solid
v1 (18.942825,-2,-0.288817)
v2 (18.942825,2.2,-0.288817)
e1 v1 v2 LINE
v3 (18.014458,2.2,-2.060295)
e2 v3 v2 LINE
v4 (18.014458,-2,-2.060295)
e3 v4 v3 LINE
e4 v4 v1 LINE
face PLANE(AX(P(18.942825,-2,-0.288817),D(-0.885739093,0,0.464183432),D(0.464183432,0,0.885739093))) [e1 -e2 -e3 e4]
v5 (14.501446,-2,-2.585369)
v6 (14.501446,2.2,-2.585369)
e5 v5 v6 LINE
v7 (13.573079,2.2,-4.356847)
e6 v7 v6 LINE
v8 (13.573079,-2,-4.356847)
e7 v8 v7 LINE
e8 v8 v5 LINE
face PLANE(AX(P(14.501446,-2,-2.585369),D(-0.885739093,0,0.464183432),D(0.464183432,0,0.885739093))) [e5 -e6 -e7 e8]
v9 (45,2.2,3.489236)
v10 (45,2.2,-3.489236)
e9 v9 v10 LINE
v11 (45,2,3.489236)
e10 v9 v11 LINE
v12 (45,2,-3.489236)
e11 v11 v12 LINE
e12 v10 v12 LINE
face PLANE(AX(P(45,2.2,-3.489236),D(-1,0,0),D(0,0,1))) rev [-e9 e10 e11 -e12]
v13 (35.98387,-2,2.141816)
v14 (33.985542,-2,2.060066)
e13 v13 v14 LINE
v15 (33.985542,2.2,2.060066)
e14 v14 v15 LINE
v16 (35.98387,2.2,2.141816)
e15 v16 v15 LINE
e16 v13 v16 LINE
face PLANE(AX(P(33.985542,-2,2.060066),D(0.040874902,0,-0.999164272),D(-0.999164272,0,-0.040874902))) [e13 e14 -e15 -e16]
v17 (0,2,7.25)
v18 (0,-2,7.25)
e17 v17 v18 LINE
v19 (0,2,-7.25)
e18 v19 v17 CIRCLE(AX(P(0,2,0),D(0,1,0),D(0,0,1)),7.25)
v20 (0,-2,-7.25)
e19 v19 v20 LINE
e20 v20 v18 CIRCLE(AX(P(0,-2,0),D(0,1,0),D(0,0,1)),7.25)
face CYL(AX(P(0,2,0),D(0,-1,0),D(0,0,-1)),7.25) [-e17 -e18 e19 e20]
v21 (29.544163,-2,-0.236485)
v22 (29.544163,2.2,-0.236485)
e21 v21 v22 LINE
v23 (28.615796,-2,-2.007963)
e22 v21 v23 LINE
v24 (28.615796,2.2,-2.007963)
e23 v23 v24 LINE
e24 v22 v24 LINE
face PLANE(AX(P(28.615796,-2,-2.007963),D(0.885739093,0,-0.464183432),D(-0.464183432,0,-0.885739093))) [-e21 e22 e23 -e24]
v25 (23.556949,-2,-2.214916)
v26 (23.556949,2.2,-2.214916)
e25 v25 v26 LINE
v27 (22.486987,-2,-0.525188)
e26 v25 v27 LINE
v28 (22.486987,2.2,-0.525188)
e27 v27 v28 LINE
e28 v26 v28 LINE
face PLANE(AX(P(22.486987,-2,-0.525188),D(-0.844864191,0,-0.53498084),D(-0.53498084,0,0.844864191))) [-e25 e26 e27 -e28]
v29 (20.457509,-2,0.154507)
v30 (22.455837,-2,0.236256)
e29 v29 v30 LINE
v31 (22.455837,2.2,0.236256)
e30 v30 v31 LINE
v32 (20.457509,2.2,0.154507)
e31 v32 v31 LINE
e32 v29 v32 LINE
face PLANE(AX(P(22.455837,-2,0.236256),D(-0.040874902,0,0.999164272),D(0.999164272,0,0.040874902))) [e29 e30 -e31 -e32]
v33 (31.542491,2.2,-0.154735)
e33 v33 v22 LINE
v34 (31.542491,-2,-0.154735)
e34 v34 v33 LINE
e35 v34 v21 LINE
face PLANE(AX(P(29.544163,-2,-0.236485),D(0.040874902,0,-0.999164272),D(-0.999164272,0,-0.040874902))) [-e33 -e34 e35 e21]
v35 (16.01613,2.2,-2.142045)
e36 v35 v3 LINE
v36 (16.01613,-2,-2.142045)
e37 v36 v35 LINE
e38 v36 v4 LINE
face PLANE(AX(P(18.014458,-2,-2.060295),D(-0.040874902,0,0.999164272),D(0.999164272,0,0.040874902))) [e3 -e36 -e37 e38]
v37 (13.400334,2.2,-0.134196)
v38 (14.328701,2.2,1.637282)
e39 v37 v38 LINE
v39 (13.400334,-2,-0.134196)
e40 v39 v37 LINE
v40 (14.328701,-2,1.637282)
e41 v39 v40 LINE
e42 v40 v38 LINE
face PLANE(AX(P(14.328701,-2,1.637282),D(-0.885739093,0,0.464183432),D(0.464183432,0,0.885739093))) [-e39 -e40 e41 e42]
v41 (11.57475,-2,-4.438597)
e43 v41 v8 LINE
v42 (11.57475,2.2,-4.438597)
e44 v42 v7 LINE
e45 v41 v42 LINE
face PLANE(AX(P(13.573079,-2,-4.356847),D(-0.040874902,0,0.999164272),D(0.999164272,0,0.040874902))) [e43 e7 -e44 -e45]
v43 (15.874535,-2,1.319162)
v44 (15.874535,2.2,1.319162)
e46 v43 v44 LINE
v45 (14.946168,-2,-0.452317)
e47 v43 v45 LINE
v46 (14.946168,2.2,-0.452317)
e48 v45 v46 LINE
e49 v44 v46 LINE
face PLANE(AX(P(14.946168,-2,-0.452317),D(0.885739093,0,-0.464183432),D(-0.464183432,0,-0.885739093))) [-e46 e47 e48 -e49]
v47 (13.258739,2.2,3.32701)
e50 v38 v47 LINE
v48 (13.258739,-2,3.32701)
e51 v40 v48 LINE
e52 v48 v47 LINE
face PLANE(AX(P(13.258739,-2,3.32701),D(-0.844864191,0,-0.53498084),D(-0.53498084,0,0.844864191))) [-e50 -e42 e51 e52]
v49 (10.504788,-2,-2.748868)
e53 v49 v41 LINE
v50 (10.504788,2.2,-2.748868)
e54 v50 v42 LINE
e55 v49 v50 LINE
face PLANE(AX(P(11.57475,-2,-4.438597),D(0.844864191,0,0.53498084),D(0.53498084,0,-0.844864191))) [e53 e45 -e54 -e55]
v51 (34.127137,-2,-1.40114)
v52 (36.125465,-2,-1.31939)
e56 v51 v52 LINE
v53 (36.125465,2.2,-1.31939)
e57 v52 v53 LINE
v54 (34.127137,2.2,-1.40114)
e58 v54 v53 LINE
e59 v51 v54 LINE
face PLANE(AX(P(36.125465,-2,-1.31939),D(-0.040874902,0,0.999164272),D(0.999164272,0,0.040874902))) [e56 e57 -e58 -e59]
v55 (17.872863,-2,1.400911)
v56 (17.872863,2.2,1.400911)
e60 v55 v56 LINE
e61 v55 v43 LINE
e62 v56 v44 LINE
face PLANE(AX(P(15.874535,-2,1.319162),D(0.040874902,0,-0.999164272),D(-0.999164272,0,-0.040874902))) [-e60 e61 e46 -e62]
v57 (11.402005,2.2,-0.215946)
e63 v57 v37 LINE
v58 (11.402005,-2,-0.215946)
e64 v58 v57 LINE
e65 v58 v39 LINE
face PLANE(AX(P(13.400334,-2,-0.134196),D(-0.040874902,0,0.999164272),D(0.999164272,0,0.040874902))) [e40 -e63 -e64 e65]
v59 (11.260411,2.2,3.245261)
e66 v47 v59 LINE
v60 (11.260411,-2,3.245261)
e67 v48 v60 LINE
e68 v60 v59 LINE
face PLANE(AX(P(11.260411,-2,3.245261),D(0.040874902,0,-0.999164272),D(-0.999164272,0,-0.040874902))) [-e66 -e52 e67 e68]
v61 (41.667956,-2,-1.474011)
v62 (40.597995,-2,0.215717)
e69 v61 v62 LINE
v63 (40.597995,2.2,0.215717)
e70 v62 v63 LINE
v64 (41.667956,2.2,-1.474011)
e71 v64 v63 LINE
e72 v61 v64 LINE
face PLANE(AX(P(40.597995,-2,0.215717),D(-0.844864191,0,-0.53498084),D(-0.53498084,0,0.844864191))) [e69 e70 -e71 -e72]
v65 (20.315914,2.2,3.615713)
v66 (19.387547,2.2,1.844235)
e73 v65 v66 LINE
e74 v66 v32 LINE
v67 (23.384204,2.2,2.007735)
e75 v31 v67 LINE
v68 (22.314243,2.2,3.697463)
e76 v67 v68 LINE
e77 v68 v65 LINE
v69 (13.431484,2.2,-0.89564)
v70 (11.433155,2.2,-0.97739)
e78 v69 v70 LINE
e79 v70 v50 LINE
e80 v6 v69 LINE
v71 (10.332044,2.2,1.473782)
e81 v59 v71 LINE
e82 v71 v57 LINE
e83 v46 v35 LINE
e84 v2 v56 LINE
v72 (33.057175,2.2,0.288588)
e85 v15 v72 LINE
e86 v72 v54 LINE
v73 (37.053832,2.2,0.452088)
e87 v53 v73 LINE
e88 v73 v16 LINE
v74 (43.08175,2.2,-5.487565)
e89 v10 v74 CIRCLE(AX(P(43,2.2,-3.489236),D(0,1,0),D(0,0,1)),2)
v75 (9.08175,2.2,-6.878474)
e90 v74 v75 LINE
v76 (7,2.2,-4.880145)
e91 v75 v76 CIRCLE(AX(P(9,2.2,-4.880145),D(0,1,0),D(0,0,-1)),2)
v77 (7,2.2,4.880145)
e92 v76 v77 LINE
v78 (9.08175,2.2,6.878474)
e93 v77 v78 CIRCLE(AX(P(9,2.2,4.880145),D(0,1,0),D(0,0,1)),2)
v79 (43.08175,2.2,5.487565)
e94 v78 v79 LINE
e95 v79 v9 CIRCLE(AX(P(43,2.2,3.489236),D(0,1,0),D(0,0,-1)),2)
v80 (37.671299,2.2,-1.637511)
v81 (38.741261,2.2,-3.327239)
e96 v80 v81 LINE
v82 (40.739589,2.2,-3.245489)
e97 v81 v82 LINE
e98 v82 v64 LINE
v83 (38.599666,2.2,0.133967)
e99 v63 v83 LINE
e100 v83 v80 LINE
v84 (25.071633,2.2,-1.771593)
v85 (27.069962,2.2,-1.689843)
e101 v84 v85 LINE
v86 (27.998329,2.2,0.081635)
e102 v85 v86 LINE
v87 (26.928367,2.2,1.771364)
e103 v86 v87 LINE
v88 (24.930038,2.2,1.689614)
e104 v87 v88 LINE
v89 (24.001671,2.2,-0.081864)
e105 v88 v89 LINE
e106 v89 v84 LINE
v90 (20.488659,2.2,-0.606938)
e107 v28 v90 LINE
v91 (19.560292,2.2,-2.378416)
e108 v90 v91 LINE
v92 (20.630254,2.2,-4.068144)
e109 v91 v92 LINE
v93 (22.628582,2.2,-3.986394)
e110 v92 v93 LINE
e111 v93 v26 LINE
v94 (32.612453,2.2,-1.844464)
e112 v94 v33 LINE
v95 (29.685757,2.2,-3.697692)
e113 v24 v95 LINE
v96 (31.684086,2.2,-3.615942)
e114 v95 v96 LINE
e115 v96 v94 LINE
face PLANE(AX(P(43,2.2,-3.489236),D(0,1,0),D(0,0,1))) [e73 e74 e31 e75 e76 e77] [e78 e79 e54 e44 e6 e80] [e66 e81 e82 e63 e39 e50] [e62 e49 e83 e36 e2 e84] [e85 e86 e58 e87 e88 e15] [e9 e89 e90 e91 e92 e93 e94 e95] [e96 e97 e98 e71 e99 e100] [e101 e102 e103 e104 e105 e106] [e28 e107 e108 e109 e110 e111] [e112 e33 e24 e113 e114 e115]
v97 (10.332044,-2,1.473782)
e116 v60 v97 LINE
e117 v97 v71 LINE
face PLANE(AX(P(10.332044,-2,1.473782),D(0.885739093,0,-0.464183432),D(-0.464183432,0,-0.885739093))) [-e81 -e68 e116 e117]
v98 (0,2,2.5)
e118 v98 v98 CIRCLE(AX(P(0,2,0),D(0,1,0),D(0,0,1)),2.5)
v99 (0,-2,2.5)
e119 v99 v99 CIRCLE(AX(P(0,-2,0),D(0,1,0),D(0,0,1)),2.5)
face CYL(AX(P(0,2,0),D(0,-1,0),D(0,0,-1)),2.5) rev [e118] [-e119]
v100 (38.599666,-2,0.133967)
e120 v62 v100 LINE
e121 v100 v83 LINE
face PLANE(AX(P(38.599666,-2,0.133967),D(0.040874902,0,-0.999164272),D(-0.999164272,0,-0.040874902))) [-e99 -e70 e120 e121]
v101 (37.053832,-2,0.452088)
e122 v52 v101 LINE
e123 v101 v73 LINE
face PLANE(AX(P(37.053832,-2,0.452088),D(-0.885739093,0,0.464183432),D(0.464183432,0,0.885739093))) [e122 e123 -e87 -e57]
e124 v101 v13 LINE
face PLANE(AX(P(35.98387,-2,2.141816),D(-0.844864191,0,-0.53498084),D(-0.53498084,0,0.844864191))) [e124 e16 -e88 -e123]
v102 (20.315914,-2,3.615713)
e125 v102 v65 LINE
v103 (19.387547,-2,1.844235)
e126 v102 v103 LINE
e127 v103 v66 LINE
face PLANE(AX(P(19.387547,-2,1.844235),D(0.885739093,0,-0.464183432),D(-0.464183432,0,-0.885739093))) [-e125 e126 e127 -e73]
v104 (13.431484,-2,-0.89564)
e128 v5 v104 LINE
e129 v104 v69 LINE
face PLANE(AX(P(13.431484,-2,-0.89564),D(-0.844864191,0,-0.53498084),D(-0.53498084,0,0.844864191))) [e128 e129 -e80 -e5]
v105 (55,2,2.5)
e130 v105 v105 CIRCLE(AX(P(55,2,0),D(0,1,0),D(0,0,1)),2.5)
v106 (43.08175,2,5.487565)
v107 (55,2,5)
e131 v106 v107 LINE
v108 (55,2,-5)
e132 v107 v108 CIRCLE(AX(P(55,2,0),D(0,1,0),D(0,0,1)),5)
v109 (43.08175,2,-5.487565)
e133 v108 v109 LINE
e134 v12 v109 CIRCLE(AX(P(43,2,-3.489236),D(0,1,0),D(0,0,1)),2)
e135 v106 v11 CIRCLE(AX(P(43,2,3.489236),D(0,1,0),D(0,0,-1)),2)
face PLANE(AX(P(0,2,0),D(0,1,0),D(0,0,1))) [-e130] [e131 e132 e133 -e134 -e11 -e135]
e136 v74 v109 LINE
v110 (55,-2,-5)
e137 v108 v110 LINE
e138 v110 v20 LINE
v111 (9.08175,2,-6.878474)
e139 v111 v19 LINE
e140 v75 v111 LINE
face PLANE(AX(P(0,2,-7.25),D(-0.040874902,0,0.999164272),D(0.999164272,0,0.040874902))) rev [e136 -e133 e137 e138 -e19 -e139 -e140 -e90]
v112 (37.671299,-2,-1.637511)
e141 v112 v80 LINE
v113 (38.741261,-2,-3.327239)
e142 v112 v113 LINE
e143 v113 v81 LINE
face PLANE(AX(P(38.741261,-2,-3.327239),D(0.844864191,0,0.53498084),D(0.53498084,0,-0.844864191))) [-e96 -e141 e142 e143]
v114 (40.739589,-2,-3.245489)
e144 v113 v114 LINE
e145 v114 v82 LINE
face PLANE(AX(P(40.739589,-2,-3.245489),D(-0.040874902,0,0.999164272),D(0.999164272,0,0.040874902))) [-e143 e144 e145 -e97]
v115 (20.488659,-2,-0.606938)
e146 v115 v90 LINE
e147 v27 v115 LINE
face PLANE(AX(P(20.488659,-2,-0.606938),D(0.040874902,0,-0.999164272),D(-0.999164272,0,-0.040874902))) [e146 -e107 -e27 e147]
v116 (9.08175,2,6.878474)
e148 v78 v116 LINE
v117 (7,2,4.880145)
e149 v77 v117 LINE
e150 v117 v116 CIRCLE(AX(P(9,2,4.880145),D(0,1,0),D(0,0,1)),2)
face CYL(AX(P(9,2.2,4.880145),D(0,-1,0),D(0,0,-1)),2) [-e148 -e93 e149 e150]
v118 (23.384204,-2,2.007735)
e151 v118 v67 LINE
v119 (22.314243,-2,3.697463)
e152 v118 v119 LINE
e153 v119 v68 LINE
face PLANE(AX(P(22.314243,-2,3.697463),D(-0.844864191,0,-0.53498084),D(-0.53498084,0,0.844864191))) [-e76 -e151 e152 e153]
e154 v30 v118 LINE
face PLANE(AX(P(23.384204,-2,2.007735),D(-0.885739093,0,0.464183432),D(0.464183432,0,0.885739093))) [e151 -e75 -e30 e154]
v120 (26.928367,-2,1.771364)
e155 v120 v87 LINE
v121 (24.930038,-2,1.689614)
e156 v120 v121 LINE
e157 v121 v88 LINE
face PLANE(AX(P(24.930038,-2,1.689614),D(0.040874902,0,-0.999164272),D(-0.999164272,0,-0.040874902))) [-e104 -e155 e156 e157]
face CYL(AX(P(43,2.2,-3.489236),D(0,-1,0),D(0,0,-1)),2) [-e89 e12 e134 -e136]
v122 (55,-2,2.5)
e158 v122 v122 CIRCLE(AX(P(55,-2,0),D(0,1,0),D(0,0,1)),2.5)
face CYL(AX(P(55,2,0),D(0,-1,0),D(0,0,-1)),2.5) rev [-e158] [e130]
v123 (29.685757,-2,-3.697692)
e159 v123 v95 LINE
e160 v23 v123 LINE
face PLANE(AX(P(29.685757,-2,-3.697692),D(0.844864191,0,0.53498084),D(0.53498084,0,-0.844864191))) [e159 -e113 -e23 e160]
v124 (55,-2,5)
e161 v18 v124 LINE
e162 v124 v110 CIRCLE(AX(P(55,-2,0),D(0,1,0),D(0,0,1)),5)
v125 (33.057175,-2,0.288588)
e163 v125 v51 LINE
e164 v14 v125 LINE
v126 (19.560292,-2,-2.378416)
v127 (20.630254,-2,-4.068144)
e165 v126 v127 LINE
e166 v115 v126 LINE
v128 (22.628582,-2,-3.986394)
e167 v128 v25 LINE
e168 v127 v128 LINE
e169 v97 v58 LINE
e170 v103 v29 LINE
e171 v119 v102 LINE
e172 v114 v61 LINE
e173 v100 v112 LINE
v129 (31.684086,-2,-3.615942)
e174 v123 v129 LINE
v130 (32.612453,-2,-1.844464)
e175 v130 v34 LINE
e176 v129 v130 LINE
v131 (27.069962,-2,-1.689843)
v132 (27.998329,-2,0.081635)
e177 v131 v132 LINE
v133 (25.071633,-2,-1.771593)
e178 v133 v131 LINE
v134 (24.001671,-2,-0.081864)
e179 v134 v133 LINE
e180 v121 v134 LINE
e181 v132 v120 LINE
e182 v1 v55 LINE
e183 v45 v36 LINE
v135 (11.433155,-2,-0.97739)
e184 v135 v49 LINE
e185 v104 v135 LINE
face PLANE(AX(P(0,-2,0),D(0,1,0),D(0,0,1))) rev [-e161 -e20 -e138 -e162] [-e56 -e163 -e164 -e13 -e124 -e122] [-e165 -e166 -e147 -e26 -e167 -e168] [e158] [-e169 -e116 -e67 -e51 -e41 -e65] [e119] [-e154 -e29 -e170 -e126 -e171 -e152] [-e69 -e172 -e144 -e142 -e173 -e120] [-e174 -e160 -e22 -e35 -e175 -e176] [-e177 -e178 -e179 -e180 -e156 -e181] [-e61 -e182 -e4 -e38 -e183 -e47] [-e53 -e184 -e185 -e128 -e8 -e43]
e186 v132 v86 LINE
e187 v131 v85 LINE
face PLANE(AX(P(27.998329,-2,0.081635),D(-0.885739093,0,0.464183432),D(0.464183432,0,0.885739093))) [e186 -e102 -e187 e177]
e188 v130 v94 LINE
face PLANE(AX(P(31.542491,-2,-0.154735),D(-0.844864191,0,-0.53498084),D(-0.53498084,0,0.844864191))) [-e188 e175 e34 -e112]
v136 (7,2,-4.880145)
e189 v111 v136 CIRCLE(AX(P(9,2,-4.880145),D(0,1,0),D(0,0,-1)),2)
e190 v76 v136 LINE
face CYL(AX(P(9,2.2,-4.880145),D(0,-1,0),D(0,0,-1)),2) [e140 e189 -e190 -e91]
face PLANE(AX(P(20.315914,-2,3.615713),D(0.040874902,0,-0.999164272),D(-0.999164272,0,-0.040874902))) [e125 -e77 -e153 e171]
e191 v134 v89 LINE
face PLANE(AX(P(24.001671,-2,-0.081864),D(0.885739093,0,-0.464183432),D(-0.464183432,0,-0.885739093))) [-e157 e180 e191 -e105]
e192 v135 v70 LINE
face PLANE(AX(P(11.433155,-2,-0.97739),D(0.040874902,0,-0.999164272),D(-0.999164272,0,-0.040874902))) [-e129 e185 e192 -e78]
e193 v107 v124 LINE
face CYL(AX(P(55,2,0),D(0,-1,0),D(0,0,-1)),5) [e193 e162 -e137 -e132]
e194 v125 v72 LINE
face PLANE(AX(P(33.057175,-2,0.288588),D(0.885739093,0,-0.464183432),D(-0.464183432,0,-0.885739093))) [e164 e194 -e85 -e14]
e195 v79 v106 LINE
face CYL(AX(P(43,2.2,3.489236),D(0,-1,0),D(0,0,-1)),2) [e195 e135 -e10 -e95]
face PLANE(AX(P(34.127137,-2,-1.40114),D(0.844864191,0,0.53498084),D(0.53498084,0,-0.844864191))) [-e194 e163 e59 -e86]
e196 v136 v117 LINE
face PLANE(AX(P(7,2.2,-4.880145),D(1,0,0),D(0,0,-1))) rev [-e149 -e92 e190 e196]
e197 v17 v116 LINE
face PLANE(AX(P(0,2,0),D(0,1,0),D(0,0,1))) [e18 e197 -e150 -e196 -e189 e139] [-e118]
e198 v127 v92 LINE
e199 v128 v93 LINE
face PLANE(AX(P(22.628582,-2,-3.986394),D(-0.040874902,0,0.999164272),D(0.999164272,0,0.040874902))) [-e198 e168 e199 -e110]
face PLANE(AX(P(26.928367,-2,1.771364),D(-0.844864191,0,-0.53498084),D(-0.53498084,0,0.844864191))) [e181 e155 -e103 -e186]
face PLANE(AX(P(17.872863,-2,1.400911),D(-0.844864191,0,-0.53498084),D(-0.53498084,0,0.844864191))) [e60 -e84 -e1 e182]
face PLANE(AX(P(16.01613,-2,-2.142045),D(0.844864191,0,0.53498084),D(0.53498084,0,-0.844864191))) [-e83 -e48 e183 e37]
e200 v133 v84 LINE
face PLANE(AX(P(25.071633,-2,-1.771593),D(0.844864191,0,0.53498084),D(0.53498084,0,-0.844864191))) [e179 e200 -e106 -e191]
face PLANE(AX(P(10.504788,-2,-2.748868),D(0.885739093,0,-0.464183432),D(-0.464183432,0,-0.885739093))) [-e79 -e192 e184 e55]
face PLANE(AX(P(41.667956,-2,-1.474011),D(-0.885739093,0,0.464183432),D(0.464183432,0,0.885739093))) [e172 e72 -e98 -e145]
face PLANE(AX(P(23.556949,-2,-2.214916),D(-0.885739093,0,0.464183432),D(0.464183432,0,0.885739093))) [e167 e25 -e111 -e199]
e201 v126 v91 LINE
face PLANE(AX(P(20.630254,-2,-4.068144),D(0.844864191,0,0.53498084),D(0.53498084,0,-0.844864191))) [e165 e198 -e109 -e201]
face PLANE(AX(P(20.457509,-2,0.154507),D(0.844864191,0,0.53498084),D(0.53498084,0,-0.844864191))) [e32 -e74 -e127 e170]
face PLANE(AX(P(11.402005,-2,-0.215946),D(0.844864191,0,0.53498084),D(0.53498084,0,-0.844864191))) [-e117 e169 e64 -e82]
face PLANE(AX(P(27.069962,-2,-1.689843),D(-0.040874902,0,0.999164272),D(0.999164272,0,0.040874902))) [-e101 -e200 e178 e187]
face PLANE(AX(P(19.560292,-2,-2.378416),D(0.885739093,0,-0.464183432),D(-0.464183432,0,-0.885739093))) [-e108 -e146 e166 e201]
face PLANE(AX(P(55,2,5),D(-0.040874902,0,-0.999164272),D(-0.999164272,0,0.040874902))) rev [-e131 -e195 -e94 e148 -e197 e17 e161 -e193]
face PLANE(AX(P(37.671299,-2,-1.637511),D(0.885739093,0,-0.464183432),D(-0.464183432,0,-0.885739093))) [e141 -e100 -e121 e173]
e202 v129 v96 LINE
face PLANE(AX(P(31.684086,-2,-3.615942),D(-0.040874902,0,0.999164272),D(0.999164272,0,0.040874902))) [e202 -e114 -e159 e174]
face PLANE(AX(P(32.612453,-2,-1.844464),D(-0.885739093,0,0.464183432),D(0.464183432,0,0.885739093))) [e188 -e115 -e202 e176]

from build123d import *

# Parameters (mm, degrees)
CROQUIS1_R              = 2.5
SALIENTE_EXTRUIR1_DEPTH = 2
SALIENTE_EXTRUIR2_DEPTH = 0.2
PATR_N_START            = -2
PATR_N_DE_RAYADO2_DEPTH = 4.2


# Read off the part's stored shape, not the designer's step: Patrón de rayado2
with BuildPart() as part:
    # Croquis1 → Saliente-Extruir1 (new, symmetric)
    with BuildSketch(Plane(origin=(0, 0, 0), x_dir=(1, 0, 0), z_dir=(0, 1, 0))):
        with BuildLine():
            Line((0, 7.25), (55, 5))
            ThreePointArc((55, 5), (60, 0), (55, -5))
            Line((55, -5), (0, -7.25))
            ThreePointArc((0, -7.25), (-7.25, 0), (0, 7.25))
        make_face()
        with Locations(Location((0, 0, 0), (0, 0, 270))):
            Circle(CROQUIS1_R, mode=Mode.SUBTRACT)
        with Locations(Location((55, 0, 0), (0, 0, 270))):
            Circle(CROQUIS1_R, mode=Mode.SUBTRACT)
    extrude(amount=SALIENTE_EXTRUIR1_DEPTH, both=True)

    # Croquis2 → Saliente-Extruir2 (add)
    with BuildSketch(Plane(origin=(0, 2, 0), x_dir=(1, 0, 0), z_dir=(0, 1, 0))):
        with BuildLine():
            Line((7, 4.880145328), (7, -4.880145328))
            ThreePointArc((7, -4.880145328), (7.614990904, -6.322972346), (9.081749804, -6.878473872))
            Line((9.081749804, -6.878473872), (43.081749804, -5.487564781))
            ThreePointArc((43.081749804, -5.487564781), (44.442827018, -4.874245333), (45, -3.489236237))
            Line((45, -3.489236237), (45, 3.489236237))
            ThreePointArc((45, 3.489236237), (44.442827018, 4.874245333), (43.081749804, 5.487564781))
            Line((43.081749804, 5.487564781), (9.081749804, 6.878473872))
            ThreePointArc((9.081749804, 6.878473872), (7.614990904, 6.322972346), (7, 4.880145328))
        make_face()
    extrude(amount=SALIENTE_EXTRUIR2_DEPTH)

    # Patrón de rayado2 outline → Patrón de rayado2 (cut)
    with BuildSketch(Plane(origin=(0, 0, 0), x_dir=(1, 0, 0), z_dir=(0, 1, 0)).offset(PATR_N_START)):
        Polygon((10.504788453, 2.748868179), (11.433155318, 0.977389992), (13.431483862, 0.895640188), (14.501445541, 2.585368571), (13.573078676, 4.356846757), (11.574750132, 4.438596561), align=None)
        Polygon((20.48865892, 0.606937572), (22.486987464, 0.525187768), (23.556949143, 2.21491615), (22.628582278, 3.986394337), (20.630253734, 4.068144141), (19.560292055, 2.378415759), align=None)
        Polygon((29.544162522, 0.236485152), (31.542491066, 0.154735348), (32.612452745, 1.84446373), (31.68408588, 3.615941917), (29.685757336, 3.697691721), (28.615795657, 2.007963338), align=None)
        Polygon((38.599666124, -0.133967268), (40.597994668, -0.215717072), (41.667956347, 1.47401131), (40.739589483, 3.245489496), (38.741260939, 3.327239301), (37.67129926, 1.637510918), align=None)
        Polygon((19.387547255, -1.84423492), (20.31591412, -3.615713106), (22.314242664, -3.69746291), (23.384204343, -2.007734528), (22.455837478, -0.236256342), (20.457508934, -0.154506537), align=None)
        Polygon((11.260410517, -3.245260686), (13.258739061, -3.32701049), (14.32870074, -1.637282108), (13.400333876, 0.134196079), (11.402005332, 0.215945883), (10.332043653, -1.473782499), align=None)
        Polygon((33.057175058, -0.288588211), (33.985541923, -2.060066397), (35.983870467, -2.141816201), (37.053832146, -0.452087819), (36.125465281, 1.319390367), (34.127136737, 1.401140171), align=None)
        Polygon((24.930038321, -1.689613977), (26.928366865, -1.771363781), (27.998328544, -0.081635399), (27.069961679, 1.689842788), (25.071633135, 1.771592592), (24.001671456, 0.081864209), align=None)
        Polygon((15.874534719, -1.319161557), (17.872863263, -1.400911361), (18.942824942, 0.288817021), (18.014458077, 2.060295208), (16.016129533, 2.142045012), (14.946167854, 0.45231663), align=None)
    extrude(amount=PATR_N_DE_RAYADO2_DEPTH, mode=Mode.SUBTRACT)


solid = part.part
